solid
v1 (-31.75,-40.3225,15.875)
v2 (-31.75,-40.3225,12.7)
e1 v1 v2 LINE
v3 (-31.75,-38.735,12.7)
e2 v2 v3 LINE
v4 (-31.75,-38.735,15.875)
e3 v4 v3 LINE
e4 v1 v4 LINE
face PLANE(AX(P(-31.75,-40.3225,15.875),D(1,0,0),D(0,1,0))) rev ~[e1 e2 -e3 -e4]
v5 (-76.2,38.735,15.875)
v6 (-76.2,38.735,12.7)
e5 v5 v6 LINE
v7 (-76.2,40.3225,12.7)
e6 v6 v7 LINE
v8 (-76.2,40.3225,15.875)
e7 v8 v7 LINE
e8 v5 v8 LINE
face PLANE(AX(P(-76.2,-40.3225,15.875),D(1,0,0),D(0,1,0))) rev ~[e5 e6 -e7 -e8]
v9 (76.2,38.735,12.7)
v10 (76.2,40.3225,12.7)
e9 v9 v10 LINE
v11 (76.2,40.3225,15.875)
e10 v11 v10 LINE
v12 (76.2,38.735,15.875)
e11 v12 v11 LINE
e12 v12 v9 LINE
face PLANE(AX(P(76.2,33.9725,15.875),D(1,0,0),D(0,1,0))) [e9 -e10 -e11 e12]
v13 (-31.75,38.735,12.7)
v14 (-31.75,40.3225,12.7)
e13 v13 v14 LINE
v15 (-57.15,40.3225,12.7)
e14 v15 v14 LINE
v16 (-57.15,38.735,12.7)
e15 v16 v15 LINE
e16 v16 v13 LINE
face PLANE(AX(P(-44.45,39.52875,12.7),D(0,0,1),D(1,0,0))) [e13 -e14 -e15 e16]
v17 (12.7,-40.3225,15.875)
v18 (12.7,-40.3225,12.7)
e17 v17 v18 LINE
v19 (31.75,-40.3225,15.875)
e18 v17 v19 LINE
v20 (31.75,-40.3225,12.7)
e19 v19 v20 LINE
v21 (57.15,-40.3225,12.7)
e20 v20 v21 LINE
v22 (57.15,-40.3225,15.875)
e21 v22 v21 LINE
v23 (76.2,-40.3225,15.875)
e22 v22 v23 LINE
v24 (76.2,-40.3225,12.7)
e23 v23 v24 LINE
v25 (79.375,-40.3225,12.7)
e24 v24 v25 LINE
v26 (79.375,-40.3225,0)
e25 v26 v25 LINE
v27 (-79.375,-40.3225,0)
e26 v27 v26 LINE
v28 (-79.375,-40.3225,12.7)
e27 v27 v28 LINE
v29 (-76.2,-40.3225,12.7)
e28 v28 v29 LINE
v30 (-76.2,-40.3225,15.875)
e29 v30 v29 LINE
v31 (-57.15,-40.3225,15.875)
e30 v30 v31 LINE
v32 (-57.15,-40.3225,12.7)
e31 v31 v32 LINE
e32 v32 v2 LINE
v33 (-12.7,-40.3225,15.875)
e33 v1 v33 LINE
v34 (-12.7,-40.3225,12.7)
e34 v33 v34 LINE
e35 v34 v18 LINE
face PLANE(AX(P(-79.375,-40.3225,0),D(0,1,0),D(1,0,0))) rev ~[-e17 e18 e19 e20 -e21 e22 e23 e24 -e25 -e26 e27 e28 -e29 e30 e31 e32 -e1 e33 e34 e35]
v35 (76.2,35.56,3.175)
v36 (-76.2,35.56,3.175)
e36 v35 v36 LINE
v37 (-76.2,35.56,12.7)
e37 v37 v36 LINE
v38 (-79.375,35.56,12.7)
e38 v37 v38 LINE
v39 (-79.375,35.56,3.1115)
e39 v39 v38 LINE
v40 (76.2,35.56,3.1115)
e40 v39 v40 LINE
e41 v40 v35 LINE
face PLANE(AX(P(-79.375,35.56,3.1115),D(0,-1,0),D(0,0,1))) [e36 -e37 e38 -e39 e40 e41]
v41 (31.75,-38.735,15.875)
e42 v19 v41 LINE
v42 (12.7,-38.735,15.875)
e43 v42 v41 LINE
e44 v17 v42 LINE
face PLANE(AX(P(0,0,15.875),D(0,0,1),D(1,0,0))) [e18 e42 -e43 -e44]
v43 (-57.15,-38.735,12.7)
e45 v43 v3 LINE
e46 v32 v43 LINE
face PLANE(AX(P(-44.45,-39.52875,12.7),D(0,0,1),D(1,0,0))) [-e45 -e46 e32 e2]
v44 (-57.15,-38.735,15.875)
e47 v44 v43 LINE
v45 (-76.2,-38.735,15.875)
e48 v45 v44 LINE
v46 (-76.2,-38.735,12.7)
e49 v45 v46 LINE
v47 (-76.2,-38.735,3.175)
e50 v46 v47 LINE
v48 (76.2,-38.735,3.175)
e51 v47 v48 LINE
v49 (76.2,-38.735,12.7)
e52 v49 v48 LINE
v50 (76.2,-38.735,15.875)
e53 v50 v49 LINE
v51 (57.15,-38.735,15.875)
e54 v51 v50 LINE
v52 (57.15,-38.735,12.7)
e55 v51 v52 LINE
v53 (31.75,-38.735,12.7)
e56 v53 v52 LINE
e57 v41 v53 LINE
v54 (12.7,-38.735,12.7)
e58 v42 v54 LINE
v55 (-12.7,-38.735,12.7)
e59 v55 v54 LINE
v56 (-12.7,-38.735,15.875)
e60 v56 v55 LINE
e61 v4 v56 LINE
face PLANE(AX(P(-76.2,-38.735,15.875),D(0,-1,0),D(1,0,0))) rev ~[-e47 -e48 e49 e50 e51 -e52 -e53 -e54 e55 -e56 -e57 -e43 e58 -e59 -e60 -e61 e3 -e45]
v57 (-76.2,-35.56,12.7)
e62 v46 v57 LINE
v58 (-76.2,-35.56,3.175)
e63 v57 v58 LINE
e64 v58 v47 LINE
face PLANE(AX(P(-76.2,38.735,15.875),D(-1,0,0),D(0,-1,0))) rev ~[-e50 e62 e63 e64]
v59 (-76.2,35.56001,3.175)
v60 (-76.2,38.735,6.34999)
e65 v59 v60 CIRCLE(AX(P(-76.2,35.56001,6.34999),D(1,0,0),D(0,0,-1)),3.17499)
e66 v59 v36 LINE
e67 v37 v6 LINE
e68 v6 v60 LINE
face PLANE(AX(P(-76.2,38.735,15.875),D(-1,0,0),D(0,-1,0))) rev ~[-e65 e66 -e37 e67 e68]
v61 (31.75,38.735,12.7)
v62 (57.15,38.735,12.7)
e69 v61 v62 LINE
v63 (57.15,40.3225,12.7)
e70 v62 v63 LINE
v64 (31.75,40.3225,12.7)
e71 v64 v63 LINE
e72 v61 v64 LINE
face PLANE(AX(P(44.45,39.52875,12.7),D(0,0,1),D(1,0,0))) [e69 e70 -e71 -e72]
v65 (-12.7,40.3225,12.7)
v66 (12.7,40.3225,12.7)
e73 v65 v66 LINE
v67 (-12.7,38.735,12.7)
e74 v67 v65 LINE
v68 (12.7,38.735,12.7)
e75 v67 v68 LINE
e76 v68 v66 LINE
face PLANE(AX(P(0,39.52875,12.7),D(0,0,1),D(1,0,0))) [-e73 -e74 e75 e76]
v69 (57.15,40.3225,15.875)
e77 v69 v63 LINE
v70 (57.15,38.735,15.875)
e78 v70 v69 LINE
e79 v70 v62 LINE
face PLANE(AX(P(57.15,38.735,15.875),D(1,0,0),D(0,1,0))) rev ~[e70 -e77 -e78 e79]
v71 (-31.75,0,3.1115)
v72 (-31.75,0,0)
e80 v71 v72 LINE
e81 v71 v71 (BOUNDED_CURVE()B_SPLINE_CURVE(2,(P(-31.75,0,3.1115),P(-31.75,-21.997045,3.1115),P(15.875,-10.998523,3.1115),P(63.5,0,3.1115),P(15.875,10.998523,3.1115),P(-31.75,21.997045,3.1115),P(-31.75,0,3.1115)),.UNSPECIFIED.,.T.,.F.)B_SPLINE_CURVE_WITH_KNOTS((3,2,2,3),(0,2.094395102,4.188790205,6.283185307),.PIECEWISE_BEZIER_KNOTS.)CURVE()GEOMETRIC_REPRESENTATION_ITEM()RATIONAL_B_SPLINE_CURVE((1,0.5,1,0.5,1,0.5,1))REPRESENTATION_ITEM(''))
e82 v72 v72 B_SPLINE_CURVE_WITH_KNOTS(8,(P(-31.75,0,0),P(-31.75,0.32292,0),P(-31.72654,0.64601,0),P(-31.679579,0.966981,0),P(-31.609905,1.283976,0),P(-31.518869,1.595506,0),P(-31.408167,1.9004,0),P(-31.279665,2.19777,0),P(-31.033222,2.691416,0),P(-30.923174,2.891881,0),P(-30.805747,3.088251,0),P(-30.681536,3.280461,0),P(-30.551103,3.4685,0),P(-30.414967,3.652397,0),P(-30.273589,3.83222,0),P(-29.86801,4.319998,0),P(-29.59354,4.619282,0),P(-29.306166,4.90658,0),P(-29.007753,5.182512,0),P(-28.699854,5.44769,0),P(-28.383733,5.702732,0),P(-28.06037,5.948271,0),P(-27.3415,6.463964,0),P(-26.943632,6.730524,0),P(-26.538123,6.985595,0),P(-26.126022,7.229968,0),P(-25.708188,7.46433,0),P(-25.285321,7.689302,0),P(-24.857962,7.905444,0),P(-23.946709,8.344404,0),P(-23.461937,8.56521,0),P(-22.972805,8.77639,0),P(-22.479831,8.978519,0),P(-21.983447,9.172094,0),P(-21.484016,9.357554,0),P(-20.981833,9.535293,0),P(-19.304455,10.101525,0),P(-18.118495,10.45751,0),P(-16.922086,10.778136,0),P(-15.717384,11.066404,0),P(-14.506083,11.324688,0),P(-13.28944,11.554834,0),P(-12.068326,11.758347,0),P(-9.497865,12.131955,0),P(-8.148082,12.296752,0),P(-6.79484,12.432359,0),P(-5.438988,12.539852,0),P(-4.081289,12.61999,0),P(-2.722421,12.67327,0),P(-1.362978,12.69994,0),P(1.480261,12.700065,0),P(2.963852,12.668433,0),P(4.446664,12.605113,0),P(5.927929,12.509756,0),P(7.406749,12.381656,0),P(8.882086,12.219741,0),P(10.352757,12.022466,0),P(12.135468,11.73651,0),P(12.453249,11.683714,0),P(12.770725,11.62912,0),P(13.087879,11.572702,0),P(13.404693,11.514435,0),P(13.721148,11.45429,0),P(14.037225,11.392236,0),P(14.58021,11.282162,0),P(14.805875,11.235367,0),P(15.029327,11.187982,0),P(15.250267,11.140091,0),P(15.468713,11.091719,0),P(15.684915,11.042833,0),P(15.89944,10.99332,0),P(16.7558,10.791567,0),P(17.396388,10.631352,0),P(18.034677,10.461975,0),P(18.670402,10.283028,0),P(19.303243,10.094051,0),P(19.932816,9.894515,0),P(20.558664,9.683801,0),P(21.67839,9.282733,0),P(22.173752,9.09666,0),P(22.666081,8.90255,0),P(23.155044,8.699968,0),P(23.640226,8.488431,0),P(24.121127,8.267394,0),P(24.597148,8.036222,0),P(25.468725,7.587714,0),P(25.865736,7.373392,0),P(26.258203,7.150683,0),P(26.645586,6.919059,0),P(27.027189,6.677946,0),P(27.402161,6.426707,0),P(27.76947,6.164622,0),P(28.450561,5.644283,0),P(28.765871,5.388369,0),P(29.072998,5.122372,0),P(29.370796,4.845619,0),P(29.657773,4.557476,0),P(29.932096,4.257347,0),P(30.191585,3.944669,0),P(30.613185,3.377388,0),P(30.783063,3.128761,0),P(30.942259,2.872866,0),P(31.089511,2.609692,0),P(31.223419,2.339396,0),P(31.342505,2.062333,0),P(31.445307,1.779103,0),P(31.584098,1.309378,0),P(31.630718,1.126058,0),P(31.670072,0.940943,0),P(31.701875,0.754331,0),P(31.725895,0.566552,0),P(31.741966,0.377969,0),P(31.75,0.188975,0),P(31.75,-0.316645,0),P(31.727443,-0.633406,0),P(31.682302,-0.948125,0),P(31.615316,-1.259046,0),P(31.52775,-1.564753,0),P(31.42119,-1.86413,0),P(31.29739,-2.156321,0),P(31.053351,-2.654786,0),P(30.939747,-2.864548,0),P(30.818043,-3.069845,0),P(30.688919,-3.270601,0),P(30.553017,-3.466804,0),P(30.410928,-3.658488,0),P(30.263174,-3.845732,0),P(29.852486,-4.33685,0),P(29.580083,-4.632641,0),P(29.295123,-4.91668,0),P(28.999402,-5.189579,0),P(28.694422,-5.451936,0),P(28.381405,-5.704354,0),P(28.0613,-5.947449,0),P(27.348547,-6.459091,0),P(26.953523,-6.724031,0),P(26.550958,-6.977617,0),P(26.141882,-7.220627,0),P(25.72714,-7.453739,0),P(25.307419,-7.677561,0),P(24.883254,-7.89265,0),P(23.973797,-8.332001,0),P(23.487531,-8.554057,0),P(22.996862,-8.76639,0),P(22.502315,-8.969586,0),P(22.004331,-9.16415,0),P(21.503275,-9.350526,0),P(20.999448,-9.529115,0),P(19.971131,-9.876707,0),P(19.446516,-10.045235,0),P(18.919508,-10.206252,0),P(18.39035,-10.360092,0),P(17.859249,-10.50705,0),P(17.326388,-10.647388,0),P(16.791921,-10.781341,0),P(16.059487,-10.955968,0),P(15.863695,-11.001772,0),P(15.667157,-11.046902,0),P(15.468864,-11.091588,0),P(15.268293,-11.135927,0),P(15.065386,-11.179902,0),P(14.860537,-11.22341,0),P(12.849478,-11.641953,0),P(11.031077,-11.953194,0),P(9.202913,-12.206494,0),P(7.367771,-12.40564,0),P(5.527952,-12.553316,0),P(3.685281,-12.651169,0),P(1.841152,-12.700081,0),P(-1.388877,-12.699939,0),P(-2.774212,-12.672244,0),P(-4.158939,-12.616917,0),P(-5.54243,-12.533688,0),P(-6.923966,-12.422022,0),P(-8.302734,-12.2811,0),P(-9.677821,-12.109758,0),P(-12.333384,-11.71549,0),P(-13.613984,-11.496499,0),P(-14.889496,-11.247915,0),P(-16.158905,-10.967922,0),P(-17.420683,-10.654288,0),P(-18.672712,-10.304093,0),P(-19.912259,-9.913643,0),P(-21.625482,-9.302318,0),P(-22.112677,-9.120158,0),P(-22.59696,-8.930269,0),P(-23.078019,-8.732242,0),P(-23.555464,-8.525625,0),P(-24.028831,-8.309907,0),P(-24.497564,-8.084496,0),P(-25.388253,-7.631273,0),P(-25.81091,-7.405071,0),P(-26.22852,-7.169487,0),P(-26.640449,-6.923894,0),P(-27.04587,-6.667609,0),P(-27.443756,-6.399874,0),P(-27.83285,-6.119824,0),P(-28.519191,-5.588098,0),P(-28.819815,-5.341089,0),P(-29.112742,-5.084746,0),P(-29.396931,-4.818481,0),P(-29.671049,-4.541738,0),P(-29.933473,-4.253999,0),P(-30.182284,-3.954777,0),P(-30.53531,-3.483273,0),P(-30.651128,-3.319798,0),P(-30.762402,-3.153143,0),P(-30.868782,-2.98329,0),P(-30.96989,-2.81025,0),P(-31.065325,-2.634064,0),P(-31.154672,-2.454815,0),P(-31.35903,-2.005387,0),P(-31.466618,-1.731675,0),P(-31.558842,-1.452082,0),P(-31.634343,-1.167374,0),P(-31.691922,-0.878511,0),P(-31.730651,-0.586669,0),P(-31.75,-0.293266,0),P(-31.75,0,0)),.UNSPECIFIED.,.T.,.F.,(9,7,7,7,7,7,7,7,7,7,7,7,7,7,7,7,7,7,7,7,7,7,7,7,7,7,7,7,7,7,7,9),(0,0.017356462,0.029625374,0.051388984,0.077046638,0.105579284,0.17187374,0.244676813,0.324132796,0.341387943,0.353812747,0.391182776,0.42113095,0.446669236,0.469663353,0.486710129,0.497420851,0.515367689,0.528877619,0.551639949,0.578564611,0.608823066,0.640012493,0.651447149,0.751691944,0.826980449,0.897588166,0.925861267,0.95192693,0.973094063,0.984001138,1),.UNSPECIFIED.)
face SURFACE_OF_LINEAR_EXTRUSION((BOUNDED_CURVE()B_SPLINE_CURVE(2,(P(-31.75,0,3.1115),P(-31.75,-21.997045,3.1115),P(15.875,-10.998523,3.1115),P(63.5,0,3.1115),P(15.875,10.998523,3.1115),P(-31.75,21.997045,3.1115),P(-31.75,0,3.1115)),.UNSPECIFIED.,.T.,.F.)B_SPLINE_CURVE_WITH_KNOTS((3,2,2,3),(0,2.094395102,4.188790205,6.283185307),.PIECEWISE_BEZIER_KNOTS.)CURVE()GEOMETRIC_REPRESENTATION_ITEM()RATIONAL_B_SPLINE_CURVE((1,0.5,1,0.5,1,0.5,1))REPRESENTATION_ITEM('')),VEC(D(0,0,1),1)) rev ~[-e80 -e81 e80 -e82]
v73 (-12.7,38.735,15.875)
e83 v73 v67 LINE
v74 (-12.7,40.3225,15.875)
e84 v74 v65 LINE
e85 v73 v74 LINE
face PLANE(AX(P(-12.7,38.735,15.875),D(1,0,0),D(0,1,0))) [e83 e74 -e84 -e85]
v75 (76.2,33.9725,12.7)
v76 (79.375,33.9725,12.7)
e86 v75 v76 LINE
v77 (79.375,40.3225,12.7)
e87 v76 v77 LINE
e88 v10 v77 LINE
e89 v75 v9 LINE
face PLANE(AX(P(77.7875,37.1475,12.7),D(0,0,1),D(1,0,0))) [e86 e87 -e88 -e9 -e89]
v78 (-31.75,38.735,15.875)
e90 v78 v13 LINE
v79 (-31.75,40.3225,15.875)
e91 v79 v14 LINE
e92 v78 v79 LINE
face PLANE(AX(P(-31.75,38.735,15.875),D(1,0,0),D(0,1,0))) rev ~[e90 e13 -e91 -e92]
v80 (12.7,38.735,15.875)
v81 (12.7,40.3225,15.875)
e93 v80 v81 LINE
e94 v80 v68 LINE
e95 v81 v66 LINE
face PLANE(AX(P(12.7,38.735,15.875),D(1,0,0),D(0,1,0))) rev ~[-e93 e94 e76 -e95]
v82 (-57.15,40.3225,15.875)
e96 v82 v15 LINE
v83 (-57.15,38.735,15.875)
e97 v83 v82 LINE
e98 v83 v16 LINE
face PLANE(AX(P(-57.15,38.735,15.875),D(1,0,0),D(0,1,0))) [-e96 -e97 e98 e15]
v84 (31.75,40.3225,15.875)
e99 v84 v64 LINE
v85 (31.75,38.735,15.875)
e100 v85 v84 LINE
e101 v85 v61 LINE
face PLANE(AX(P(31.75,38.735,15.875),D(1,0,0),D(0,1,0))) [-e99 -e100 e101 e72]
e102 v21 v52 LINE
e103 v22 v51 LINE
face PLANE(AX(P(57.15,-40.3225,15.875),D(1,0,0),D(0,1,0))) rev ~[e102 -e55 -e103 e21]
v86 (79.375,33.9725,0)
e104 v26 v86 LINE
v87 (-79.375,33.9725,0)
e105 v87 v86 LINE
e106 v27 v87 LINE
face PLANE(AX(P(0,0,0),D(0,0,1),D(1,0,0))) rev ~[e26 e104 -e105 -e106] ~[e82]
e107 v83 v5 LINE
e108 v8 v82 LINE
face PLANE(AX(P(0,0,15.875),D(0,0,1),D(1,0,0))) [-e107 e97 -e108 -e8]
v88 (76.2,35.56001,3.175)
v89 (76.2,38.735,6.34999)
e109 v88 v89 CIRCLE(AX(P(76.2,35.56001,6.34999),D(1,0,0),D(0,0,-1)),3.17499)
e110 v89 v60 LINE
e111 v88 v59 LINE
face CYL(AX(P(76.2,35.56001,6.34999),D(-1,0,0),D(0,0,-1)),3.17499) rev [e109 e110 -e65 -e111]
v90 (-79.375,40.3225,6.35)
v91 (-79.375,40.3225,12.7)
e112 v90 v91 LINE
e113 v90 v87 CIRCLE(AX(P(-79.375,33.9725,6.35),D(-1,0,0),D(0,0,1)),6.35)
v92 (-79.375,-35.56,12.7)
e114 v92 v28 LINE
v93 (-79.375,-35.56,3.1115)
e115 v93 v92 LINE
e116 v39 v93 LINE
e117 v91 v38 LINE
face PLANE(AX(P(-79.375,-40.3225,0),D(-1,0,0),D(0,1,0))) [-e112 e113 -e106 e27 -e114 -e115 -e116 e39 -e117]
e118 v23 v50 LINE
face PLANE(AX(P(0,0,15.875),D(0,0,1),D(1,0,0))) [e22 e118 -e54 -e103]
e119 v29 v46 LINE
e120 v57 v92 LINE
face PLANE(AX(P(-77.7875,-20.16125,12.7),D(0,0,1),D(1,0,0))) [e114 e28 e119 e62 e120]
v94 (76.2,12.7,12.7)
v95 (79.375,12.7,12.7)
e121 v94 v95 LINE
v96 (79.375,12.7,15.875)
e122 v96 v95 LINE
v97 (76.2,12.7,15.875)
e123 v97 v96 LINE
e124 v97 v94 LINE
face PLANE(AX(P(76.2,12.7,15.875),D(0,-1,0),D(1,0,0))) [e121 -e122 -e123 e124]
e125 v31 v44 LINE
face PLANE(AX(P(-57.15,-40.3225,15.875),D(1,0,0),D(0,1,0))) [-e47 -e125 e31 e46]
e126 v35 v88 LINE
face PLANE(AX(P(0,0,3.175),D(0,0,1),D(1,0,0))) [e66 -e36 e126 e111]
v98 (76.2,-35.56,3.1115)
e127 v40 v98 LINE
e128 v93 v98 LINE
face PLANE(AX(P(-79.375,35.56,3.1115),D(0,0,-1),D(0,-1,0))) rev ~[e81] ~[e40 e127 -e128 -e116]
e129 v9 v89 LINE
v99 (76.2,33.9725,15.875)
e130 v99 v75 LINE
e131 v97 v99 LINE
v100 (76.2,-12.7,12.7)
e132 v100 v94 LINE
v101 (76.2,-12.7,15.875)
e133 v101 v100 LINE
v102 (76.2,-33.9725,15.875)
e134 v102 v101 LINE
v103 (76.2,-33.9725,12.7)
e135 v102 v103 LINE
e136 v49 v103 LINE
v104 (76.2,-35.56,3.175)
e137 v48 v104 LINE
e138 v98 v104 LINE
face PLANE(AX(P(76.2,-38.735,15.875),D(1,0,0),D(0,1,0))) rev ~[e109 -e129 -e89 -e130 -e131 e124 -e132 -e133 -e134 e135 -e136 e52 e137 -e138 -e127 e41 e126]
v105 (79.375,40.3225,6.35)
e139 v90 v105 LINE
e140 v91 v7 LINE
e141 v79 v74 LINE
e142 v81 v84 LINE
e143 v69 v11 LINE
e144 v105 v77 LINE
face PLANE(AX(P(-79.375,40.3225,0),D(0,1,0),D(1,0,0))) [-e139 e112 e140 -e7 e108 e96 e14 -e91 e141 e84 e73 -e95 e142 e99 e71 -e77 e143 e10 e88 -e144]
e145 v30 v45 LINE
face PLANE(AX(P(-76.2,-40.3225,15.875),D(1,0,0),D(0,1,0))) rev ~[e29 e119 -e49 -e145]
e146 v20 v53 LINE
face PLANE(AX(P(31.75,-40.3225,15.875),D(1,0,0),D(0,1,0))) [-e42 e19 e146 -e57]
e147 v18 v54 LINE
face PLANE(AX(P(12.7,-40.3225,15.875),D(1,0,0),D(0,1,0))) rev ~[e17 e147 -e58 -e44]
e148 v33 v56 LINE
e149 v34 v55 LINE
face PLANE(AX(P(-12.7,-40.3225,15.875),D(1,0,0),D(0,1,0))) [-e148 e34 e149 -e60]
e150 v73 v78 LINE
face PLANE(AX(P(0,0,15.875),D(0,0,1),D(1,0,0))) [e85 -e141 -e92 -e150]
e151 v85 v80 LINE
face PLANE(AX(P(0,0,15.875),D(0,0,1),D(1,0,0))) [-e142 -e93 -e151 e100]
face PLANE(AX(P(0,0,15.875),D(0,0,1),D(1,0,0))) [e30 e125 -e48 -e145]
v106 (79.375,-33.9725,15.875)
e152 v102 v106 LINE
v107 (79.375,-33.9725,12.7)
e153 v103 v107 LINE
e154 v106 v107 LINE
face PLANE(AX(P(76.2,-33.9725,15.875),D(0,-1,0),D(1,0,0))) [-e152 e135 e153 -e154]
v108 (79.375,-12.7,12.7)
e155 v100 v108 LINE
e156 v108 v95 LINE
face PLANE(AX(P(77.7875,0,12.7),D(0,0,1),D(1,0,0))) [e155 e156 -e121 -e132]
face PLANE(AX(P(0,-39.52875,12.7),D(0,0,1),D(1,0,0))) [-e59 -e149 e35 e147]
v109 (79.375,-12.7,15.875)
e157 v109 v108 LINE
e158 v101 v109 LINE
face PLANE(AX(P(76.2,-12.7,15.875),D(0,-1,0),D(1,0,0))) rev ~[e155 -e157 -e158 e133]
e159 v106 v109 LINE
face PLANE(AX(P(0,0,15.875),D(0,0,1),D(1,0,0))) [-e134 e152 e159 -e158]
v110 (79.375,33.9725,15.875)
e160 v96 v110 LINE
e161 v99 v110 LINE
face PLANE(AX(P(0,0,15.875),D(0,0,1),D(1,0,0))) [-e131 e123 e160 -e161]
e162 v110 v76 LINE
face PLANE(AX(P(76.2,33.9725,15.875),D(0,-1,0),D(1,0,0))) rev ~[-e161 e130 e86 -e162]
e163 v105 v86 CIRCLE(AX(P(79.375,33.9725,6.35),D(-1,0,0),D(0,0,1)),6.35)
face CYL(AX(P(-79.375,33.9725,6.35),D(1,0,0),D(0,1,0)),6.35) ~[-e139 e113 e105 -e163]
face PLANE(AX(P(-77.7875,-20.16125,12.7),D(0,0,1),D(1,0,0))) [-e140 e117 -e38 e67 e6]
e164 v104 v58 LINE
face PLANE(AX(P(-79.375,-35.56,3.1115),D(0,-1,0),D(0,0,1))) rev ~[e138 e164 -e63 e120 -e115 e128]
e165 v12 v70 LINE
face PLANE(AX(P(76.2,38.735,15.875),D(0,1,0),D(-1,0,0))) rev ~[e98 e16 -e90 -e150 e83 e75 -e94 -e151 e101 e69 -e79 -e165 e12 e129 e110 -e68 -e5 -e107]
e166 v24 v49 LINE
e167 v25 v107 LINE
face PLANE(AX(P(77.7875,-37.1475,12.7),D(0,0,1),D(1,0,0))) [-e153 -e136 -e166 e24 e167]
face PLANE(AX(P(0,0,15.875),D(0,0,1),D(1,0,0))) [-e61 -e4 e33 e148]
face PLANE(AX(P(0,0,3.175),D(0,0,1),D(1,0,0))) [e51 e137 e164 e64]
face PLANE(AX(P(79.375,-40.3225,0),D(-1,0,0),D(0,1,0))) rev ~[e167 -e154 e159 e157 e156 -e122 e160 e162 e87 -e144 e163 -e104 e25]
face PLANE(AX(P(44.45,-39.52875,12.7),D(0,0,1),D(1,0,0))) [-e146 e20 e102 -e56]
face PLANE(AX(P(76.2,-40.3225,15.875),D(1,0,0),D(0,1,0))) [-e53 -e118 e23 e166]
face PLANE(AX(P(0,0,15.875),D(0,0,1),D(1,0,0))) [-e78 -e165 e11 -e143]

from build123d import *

# Parameters (mm, degrees)
F0_W     = 158.75
F0_H     = 80.645
F1_DEPTH = 15.875
F2_W     = 71.12
F2_H     = 9.652
F3_DEPTH = 155.575
F5_DEPTH = 12.7
F6_W     = 3.175
F6_H     = 40.3225
F6_W_2   = 25.4
F6_H_2   = 1.5875
F6_H_3   = 6.35
F6_H_4   = 25.4
F7_DEPTH = 3.175
F9_DEPTH = 25.4
F10_R    = 3.17499
F11_R    = 6.35


# Not quite as in the source:
# - a fillet or chamfer is up to 0.001 mm smaller than in the source, because OpenCascade refuses the exact size


with BuildPart() as f1:
    # F0 (on Top) → F1 (new body)
    with BuildSketch(Plane.XY):
        Rectangle(F0_W, F0_H)
    extrude(amount=F1_DEPTH)

    # F2 (on face) → F3 (cut)
    with BuildSketch(Plane(origin=(-79.375, 0, 0), x_dir=(0, -1, 0), z_dir=(-1, 0, 0))):
        with Locations((0, 7.9375)):
            Rectangle(F2_W, F2_H)
    extrude(amount=-F3_DEPTH, mode=Mode.SUBTRACT)

    # F4 (on face) → F5 (cut)
    with BuildSketch(Plane.XY.offset(15.875)):
        Polygon((76.2, 38.735), (-76.2, 38.735), (-76.2, 0), (-76.2, -38.735), (76.2, -38.735), align=None)
    extrude(amount=-F5_DEPTH, mode=Mode.SUBTRACT)

    # F6 (on face) → F7 (cut)
    with BuildSketch(Plane.XY.offset(15.875)):
        with Locations((-77.7875, -20.16125)):
            Rectangle(F6_W, F6_H)
        with Locations((-77.7875, 20.16125)):
            Rectangle(F6_W, F6_H)
        with Locations((-44.45, -39.52875)):
            Rectangle(F6_W_2, F6_H_2)
        with Locations((0, -39.52875)):
            Rectangle(F6_W_2, F6_H_2)
        with Locations((44.45, -39.52875)):
            Rectangle(F6_W_2, F6_H_2)
        with Locations((-44.45, 39.52875)):
            Rectangle(F6_W_2, F6_H_2)
        with Locations((0, 39.52875)):
            Rectangle(F6_W_2, F6_H_2)
        with Locations((44.45, 39.52875)):
            Rectangle(F6_W_2, F6_H_2)
        with Locations((77.7875, 37.1475)):
            Rectangle(F6_W, F6_H_3)
        with Locations((77.7875, -37.1475)):
            Rectangle(F6_W, F6_H_3)
        with Locations((77.7875, 0)):
            Rectangle(F6_W, F6_H_4)
    extrude(amount=-F7_DEPTH, mode=Mode.SUBTRACT)

    # F8 (on face) → F9 (cut)
    with BuildSketch(Plane.XY.offset(3.1115)):
        with BuildLine():
            add(Edge.make_bspline(
                [(-31.75, 0), (-31.75, -21.9970452561), (15.875, -10.9985226281), (63.5, 0), (15.875, 10.9985226281), (-31.75, 21.9970452561), (-31.75, 0)],
                knots=[0, 0, 0, 2.0943951024, 2.0943951024, 4.1887902048, 4.1887902048, 6.2831853072, 6.2831853072, 6.2831853072], degree=2, weights=[1, 0.5, 1, 0.5, 1, 0.5, 1]))
        make_face()
    extrude(amount=-F9_DEPTH, mode=Mode.SUBTRACT)

    # F10 (radius 3.175 in the source; OpenCascade refuses exactly that, so slightly less here)
    f10_edges = [f1.edges().sort_by_distance(p)[0] for p in [
        (0, 38.735, 3.175),
    ]]
    fillet(f10_edges, radius=F10_R)

    # F11
    f11_edges = [f1.edges().sort_by_distance(p)[0] for p in [
        (0, 40.3225, 0),
    ]]
    fillet(f11_edges, radius=F11_R)


solid = f1.part
